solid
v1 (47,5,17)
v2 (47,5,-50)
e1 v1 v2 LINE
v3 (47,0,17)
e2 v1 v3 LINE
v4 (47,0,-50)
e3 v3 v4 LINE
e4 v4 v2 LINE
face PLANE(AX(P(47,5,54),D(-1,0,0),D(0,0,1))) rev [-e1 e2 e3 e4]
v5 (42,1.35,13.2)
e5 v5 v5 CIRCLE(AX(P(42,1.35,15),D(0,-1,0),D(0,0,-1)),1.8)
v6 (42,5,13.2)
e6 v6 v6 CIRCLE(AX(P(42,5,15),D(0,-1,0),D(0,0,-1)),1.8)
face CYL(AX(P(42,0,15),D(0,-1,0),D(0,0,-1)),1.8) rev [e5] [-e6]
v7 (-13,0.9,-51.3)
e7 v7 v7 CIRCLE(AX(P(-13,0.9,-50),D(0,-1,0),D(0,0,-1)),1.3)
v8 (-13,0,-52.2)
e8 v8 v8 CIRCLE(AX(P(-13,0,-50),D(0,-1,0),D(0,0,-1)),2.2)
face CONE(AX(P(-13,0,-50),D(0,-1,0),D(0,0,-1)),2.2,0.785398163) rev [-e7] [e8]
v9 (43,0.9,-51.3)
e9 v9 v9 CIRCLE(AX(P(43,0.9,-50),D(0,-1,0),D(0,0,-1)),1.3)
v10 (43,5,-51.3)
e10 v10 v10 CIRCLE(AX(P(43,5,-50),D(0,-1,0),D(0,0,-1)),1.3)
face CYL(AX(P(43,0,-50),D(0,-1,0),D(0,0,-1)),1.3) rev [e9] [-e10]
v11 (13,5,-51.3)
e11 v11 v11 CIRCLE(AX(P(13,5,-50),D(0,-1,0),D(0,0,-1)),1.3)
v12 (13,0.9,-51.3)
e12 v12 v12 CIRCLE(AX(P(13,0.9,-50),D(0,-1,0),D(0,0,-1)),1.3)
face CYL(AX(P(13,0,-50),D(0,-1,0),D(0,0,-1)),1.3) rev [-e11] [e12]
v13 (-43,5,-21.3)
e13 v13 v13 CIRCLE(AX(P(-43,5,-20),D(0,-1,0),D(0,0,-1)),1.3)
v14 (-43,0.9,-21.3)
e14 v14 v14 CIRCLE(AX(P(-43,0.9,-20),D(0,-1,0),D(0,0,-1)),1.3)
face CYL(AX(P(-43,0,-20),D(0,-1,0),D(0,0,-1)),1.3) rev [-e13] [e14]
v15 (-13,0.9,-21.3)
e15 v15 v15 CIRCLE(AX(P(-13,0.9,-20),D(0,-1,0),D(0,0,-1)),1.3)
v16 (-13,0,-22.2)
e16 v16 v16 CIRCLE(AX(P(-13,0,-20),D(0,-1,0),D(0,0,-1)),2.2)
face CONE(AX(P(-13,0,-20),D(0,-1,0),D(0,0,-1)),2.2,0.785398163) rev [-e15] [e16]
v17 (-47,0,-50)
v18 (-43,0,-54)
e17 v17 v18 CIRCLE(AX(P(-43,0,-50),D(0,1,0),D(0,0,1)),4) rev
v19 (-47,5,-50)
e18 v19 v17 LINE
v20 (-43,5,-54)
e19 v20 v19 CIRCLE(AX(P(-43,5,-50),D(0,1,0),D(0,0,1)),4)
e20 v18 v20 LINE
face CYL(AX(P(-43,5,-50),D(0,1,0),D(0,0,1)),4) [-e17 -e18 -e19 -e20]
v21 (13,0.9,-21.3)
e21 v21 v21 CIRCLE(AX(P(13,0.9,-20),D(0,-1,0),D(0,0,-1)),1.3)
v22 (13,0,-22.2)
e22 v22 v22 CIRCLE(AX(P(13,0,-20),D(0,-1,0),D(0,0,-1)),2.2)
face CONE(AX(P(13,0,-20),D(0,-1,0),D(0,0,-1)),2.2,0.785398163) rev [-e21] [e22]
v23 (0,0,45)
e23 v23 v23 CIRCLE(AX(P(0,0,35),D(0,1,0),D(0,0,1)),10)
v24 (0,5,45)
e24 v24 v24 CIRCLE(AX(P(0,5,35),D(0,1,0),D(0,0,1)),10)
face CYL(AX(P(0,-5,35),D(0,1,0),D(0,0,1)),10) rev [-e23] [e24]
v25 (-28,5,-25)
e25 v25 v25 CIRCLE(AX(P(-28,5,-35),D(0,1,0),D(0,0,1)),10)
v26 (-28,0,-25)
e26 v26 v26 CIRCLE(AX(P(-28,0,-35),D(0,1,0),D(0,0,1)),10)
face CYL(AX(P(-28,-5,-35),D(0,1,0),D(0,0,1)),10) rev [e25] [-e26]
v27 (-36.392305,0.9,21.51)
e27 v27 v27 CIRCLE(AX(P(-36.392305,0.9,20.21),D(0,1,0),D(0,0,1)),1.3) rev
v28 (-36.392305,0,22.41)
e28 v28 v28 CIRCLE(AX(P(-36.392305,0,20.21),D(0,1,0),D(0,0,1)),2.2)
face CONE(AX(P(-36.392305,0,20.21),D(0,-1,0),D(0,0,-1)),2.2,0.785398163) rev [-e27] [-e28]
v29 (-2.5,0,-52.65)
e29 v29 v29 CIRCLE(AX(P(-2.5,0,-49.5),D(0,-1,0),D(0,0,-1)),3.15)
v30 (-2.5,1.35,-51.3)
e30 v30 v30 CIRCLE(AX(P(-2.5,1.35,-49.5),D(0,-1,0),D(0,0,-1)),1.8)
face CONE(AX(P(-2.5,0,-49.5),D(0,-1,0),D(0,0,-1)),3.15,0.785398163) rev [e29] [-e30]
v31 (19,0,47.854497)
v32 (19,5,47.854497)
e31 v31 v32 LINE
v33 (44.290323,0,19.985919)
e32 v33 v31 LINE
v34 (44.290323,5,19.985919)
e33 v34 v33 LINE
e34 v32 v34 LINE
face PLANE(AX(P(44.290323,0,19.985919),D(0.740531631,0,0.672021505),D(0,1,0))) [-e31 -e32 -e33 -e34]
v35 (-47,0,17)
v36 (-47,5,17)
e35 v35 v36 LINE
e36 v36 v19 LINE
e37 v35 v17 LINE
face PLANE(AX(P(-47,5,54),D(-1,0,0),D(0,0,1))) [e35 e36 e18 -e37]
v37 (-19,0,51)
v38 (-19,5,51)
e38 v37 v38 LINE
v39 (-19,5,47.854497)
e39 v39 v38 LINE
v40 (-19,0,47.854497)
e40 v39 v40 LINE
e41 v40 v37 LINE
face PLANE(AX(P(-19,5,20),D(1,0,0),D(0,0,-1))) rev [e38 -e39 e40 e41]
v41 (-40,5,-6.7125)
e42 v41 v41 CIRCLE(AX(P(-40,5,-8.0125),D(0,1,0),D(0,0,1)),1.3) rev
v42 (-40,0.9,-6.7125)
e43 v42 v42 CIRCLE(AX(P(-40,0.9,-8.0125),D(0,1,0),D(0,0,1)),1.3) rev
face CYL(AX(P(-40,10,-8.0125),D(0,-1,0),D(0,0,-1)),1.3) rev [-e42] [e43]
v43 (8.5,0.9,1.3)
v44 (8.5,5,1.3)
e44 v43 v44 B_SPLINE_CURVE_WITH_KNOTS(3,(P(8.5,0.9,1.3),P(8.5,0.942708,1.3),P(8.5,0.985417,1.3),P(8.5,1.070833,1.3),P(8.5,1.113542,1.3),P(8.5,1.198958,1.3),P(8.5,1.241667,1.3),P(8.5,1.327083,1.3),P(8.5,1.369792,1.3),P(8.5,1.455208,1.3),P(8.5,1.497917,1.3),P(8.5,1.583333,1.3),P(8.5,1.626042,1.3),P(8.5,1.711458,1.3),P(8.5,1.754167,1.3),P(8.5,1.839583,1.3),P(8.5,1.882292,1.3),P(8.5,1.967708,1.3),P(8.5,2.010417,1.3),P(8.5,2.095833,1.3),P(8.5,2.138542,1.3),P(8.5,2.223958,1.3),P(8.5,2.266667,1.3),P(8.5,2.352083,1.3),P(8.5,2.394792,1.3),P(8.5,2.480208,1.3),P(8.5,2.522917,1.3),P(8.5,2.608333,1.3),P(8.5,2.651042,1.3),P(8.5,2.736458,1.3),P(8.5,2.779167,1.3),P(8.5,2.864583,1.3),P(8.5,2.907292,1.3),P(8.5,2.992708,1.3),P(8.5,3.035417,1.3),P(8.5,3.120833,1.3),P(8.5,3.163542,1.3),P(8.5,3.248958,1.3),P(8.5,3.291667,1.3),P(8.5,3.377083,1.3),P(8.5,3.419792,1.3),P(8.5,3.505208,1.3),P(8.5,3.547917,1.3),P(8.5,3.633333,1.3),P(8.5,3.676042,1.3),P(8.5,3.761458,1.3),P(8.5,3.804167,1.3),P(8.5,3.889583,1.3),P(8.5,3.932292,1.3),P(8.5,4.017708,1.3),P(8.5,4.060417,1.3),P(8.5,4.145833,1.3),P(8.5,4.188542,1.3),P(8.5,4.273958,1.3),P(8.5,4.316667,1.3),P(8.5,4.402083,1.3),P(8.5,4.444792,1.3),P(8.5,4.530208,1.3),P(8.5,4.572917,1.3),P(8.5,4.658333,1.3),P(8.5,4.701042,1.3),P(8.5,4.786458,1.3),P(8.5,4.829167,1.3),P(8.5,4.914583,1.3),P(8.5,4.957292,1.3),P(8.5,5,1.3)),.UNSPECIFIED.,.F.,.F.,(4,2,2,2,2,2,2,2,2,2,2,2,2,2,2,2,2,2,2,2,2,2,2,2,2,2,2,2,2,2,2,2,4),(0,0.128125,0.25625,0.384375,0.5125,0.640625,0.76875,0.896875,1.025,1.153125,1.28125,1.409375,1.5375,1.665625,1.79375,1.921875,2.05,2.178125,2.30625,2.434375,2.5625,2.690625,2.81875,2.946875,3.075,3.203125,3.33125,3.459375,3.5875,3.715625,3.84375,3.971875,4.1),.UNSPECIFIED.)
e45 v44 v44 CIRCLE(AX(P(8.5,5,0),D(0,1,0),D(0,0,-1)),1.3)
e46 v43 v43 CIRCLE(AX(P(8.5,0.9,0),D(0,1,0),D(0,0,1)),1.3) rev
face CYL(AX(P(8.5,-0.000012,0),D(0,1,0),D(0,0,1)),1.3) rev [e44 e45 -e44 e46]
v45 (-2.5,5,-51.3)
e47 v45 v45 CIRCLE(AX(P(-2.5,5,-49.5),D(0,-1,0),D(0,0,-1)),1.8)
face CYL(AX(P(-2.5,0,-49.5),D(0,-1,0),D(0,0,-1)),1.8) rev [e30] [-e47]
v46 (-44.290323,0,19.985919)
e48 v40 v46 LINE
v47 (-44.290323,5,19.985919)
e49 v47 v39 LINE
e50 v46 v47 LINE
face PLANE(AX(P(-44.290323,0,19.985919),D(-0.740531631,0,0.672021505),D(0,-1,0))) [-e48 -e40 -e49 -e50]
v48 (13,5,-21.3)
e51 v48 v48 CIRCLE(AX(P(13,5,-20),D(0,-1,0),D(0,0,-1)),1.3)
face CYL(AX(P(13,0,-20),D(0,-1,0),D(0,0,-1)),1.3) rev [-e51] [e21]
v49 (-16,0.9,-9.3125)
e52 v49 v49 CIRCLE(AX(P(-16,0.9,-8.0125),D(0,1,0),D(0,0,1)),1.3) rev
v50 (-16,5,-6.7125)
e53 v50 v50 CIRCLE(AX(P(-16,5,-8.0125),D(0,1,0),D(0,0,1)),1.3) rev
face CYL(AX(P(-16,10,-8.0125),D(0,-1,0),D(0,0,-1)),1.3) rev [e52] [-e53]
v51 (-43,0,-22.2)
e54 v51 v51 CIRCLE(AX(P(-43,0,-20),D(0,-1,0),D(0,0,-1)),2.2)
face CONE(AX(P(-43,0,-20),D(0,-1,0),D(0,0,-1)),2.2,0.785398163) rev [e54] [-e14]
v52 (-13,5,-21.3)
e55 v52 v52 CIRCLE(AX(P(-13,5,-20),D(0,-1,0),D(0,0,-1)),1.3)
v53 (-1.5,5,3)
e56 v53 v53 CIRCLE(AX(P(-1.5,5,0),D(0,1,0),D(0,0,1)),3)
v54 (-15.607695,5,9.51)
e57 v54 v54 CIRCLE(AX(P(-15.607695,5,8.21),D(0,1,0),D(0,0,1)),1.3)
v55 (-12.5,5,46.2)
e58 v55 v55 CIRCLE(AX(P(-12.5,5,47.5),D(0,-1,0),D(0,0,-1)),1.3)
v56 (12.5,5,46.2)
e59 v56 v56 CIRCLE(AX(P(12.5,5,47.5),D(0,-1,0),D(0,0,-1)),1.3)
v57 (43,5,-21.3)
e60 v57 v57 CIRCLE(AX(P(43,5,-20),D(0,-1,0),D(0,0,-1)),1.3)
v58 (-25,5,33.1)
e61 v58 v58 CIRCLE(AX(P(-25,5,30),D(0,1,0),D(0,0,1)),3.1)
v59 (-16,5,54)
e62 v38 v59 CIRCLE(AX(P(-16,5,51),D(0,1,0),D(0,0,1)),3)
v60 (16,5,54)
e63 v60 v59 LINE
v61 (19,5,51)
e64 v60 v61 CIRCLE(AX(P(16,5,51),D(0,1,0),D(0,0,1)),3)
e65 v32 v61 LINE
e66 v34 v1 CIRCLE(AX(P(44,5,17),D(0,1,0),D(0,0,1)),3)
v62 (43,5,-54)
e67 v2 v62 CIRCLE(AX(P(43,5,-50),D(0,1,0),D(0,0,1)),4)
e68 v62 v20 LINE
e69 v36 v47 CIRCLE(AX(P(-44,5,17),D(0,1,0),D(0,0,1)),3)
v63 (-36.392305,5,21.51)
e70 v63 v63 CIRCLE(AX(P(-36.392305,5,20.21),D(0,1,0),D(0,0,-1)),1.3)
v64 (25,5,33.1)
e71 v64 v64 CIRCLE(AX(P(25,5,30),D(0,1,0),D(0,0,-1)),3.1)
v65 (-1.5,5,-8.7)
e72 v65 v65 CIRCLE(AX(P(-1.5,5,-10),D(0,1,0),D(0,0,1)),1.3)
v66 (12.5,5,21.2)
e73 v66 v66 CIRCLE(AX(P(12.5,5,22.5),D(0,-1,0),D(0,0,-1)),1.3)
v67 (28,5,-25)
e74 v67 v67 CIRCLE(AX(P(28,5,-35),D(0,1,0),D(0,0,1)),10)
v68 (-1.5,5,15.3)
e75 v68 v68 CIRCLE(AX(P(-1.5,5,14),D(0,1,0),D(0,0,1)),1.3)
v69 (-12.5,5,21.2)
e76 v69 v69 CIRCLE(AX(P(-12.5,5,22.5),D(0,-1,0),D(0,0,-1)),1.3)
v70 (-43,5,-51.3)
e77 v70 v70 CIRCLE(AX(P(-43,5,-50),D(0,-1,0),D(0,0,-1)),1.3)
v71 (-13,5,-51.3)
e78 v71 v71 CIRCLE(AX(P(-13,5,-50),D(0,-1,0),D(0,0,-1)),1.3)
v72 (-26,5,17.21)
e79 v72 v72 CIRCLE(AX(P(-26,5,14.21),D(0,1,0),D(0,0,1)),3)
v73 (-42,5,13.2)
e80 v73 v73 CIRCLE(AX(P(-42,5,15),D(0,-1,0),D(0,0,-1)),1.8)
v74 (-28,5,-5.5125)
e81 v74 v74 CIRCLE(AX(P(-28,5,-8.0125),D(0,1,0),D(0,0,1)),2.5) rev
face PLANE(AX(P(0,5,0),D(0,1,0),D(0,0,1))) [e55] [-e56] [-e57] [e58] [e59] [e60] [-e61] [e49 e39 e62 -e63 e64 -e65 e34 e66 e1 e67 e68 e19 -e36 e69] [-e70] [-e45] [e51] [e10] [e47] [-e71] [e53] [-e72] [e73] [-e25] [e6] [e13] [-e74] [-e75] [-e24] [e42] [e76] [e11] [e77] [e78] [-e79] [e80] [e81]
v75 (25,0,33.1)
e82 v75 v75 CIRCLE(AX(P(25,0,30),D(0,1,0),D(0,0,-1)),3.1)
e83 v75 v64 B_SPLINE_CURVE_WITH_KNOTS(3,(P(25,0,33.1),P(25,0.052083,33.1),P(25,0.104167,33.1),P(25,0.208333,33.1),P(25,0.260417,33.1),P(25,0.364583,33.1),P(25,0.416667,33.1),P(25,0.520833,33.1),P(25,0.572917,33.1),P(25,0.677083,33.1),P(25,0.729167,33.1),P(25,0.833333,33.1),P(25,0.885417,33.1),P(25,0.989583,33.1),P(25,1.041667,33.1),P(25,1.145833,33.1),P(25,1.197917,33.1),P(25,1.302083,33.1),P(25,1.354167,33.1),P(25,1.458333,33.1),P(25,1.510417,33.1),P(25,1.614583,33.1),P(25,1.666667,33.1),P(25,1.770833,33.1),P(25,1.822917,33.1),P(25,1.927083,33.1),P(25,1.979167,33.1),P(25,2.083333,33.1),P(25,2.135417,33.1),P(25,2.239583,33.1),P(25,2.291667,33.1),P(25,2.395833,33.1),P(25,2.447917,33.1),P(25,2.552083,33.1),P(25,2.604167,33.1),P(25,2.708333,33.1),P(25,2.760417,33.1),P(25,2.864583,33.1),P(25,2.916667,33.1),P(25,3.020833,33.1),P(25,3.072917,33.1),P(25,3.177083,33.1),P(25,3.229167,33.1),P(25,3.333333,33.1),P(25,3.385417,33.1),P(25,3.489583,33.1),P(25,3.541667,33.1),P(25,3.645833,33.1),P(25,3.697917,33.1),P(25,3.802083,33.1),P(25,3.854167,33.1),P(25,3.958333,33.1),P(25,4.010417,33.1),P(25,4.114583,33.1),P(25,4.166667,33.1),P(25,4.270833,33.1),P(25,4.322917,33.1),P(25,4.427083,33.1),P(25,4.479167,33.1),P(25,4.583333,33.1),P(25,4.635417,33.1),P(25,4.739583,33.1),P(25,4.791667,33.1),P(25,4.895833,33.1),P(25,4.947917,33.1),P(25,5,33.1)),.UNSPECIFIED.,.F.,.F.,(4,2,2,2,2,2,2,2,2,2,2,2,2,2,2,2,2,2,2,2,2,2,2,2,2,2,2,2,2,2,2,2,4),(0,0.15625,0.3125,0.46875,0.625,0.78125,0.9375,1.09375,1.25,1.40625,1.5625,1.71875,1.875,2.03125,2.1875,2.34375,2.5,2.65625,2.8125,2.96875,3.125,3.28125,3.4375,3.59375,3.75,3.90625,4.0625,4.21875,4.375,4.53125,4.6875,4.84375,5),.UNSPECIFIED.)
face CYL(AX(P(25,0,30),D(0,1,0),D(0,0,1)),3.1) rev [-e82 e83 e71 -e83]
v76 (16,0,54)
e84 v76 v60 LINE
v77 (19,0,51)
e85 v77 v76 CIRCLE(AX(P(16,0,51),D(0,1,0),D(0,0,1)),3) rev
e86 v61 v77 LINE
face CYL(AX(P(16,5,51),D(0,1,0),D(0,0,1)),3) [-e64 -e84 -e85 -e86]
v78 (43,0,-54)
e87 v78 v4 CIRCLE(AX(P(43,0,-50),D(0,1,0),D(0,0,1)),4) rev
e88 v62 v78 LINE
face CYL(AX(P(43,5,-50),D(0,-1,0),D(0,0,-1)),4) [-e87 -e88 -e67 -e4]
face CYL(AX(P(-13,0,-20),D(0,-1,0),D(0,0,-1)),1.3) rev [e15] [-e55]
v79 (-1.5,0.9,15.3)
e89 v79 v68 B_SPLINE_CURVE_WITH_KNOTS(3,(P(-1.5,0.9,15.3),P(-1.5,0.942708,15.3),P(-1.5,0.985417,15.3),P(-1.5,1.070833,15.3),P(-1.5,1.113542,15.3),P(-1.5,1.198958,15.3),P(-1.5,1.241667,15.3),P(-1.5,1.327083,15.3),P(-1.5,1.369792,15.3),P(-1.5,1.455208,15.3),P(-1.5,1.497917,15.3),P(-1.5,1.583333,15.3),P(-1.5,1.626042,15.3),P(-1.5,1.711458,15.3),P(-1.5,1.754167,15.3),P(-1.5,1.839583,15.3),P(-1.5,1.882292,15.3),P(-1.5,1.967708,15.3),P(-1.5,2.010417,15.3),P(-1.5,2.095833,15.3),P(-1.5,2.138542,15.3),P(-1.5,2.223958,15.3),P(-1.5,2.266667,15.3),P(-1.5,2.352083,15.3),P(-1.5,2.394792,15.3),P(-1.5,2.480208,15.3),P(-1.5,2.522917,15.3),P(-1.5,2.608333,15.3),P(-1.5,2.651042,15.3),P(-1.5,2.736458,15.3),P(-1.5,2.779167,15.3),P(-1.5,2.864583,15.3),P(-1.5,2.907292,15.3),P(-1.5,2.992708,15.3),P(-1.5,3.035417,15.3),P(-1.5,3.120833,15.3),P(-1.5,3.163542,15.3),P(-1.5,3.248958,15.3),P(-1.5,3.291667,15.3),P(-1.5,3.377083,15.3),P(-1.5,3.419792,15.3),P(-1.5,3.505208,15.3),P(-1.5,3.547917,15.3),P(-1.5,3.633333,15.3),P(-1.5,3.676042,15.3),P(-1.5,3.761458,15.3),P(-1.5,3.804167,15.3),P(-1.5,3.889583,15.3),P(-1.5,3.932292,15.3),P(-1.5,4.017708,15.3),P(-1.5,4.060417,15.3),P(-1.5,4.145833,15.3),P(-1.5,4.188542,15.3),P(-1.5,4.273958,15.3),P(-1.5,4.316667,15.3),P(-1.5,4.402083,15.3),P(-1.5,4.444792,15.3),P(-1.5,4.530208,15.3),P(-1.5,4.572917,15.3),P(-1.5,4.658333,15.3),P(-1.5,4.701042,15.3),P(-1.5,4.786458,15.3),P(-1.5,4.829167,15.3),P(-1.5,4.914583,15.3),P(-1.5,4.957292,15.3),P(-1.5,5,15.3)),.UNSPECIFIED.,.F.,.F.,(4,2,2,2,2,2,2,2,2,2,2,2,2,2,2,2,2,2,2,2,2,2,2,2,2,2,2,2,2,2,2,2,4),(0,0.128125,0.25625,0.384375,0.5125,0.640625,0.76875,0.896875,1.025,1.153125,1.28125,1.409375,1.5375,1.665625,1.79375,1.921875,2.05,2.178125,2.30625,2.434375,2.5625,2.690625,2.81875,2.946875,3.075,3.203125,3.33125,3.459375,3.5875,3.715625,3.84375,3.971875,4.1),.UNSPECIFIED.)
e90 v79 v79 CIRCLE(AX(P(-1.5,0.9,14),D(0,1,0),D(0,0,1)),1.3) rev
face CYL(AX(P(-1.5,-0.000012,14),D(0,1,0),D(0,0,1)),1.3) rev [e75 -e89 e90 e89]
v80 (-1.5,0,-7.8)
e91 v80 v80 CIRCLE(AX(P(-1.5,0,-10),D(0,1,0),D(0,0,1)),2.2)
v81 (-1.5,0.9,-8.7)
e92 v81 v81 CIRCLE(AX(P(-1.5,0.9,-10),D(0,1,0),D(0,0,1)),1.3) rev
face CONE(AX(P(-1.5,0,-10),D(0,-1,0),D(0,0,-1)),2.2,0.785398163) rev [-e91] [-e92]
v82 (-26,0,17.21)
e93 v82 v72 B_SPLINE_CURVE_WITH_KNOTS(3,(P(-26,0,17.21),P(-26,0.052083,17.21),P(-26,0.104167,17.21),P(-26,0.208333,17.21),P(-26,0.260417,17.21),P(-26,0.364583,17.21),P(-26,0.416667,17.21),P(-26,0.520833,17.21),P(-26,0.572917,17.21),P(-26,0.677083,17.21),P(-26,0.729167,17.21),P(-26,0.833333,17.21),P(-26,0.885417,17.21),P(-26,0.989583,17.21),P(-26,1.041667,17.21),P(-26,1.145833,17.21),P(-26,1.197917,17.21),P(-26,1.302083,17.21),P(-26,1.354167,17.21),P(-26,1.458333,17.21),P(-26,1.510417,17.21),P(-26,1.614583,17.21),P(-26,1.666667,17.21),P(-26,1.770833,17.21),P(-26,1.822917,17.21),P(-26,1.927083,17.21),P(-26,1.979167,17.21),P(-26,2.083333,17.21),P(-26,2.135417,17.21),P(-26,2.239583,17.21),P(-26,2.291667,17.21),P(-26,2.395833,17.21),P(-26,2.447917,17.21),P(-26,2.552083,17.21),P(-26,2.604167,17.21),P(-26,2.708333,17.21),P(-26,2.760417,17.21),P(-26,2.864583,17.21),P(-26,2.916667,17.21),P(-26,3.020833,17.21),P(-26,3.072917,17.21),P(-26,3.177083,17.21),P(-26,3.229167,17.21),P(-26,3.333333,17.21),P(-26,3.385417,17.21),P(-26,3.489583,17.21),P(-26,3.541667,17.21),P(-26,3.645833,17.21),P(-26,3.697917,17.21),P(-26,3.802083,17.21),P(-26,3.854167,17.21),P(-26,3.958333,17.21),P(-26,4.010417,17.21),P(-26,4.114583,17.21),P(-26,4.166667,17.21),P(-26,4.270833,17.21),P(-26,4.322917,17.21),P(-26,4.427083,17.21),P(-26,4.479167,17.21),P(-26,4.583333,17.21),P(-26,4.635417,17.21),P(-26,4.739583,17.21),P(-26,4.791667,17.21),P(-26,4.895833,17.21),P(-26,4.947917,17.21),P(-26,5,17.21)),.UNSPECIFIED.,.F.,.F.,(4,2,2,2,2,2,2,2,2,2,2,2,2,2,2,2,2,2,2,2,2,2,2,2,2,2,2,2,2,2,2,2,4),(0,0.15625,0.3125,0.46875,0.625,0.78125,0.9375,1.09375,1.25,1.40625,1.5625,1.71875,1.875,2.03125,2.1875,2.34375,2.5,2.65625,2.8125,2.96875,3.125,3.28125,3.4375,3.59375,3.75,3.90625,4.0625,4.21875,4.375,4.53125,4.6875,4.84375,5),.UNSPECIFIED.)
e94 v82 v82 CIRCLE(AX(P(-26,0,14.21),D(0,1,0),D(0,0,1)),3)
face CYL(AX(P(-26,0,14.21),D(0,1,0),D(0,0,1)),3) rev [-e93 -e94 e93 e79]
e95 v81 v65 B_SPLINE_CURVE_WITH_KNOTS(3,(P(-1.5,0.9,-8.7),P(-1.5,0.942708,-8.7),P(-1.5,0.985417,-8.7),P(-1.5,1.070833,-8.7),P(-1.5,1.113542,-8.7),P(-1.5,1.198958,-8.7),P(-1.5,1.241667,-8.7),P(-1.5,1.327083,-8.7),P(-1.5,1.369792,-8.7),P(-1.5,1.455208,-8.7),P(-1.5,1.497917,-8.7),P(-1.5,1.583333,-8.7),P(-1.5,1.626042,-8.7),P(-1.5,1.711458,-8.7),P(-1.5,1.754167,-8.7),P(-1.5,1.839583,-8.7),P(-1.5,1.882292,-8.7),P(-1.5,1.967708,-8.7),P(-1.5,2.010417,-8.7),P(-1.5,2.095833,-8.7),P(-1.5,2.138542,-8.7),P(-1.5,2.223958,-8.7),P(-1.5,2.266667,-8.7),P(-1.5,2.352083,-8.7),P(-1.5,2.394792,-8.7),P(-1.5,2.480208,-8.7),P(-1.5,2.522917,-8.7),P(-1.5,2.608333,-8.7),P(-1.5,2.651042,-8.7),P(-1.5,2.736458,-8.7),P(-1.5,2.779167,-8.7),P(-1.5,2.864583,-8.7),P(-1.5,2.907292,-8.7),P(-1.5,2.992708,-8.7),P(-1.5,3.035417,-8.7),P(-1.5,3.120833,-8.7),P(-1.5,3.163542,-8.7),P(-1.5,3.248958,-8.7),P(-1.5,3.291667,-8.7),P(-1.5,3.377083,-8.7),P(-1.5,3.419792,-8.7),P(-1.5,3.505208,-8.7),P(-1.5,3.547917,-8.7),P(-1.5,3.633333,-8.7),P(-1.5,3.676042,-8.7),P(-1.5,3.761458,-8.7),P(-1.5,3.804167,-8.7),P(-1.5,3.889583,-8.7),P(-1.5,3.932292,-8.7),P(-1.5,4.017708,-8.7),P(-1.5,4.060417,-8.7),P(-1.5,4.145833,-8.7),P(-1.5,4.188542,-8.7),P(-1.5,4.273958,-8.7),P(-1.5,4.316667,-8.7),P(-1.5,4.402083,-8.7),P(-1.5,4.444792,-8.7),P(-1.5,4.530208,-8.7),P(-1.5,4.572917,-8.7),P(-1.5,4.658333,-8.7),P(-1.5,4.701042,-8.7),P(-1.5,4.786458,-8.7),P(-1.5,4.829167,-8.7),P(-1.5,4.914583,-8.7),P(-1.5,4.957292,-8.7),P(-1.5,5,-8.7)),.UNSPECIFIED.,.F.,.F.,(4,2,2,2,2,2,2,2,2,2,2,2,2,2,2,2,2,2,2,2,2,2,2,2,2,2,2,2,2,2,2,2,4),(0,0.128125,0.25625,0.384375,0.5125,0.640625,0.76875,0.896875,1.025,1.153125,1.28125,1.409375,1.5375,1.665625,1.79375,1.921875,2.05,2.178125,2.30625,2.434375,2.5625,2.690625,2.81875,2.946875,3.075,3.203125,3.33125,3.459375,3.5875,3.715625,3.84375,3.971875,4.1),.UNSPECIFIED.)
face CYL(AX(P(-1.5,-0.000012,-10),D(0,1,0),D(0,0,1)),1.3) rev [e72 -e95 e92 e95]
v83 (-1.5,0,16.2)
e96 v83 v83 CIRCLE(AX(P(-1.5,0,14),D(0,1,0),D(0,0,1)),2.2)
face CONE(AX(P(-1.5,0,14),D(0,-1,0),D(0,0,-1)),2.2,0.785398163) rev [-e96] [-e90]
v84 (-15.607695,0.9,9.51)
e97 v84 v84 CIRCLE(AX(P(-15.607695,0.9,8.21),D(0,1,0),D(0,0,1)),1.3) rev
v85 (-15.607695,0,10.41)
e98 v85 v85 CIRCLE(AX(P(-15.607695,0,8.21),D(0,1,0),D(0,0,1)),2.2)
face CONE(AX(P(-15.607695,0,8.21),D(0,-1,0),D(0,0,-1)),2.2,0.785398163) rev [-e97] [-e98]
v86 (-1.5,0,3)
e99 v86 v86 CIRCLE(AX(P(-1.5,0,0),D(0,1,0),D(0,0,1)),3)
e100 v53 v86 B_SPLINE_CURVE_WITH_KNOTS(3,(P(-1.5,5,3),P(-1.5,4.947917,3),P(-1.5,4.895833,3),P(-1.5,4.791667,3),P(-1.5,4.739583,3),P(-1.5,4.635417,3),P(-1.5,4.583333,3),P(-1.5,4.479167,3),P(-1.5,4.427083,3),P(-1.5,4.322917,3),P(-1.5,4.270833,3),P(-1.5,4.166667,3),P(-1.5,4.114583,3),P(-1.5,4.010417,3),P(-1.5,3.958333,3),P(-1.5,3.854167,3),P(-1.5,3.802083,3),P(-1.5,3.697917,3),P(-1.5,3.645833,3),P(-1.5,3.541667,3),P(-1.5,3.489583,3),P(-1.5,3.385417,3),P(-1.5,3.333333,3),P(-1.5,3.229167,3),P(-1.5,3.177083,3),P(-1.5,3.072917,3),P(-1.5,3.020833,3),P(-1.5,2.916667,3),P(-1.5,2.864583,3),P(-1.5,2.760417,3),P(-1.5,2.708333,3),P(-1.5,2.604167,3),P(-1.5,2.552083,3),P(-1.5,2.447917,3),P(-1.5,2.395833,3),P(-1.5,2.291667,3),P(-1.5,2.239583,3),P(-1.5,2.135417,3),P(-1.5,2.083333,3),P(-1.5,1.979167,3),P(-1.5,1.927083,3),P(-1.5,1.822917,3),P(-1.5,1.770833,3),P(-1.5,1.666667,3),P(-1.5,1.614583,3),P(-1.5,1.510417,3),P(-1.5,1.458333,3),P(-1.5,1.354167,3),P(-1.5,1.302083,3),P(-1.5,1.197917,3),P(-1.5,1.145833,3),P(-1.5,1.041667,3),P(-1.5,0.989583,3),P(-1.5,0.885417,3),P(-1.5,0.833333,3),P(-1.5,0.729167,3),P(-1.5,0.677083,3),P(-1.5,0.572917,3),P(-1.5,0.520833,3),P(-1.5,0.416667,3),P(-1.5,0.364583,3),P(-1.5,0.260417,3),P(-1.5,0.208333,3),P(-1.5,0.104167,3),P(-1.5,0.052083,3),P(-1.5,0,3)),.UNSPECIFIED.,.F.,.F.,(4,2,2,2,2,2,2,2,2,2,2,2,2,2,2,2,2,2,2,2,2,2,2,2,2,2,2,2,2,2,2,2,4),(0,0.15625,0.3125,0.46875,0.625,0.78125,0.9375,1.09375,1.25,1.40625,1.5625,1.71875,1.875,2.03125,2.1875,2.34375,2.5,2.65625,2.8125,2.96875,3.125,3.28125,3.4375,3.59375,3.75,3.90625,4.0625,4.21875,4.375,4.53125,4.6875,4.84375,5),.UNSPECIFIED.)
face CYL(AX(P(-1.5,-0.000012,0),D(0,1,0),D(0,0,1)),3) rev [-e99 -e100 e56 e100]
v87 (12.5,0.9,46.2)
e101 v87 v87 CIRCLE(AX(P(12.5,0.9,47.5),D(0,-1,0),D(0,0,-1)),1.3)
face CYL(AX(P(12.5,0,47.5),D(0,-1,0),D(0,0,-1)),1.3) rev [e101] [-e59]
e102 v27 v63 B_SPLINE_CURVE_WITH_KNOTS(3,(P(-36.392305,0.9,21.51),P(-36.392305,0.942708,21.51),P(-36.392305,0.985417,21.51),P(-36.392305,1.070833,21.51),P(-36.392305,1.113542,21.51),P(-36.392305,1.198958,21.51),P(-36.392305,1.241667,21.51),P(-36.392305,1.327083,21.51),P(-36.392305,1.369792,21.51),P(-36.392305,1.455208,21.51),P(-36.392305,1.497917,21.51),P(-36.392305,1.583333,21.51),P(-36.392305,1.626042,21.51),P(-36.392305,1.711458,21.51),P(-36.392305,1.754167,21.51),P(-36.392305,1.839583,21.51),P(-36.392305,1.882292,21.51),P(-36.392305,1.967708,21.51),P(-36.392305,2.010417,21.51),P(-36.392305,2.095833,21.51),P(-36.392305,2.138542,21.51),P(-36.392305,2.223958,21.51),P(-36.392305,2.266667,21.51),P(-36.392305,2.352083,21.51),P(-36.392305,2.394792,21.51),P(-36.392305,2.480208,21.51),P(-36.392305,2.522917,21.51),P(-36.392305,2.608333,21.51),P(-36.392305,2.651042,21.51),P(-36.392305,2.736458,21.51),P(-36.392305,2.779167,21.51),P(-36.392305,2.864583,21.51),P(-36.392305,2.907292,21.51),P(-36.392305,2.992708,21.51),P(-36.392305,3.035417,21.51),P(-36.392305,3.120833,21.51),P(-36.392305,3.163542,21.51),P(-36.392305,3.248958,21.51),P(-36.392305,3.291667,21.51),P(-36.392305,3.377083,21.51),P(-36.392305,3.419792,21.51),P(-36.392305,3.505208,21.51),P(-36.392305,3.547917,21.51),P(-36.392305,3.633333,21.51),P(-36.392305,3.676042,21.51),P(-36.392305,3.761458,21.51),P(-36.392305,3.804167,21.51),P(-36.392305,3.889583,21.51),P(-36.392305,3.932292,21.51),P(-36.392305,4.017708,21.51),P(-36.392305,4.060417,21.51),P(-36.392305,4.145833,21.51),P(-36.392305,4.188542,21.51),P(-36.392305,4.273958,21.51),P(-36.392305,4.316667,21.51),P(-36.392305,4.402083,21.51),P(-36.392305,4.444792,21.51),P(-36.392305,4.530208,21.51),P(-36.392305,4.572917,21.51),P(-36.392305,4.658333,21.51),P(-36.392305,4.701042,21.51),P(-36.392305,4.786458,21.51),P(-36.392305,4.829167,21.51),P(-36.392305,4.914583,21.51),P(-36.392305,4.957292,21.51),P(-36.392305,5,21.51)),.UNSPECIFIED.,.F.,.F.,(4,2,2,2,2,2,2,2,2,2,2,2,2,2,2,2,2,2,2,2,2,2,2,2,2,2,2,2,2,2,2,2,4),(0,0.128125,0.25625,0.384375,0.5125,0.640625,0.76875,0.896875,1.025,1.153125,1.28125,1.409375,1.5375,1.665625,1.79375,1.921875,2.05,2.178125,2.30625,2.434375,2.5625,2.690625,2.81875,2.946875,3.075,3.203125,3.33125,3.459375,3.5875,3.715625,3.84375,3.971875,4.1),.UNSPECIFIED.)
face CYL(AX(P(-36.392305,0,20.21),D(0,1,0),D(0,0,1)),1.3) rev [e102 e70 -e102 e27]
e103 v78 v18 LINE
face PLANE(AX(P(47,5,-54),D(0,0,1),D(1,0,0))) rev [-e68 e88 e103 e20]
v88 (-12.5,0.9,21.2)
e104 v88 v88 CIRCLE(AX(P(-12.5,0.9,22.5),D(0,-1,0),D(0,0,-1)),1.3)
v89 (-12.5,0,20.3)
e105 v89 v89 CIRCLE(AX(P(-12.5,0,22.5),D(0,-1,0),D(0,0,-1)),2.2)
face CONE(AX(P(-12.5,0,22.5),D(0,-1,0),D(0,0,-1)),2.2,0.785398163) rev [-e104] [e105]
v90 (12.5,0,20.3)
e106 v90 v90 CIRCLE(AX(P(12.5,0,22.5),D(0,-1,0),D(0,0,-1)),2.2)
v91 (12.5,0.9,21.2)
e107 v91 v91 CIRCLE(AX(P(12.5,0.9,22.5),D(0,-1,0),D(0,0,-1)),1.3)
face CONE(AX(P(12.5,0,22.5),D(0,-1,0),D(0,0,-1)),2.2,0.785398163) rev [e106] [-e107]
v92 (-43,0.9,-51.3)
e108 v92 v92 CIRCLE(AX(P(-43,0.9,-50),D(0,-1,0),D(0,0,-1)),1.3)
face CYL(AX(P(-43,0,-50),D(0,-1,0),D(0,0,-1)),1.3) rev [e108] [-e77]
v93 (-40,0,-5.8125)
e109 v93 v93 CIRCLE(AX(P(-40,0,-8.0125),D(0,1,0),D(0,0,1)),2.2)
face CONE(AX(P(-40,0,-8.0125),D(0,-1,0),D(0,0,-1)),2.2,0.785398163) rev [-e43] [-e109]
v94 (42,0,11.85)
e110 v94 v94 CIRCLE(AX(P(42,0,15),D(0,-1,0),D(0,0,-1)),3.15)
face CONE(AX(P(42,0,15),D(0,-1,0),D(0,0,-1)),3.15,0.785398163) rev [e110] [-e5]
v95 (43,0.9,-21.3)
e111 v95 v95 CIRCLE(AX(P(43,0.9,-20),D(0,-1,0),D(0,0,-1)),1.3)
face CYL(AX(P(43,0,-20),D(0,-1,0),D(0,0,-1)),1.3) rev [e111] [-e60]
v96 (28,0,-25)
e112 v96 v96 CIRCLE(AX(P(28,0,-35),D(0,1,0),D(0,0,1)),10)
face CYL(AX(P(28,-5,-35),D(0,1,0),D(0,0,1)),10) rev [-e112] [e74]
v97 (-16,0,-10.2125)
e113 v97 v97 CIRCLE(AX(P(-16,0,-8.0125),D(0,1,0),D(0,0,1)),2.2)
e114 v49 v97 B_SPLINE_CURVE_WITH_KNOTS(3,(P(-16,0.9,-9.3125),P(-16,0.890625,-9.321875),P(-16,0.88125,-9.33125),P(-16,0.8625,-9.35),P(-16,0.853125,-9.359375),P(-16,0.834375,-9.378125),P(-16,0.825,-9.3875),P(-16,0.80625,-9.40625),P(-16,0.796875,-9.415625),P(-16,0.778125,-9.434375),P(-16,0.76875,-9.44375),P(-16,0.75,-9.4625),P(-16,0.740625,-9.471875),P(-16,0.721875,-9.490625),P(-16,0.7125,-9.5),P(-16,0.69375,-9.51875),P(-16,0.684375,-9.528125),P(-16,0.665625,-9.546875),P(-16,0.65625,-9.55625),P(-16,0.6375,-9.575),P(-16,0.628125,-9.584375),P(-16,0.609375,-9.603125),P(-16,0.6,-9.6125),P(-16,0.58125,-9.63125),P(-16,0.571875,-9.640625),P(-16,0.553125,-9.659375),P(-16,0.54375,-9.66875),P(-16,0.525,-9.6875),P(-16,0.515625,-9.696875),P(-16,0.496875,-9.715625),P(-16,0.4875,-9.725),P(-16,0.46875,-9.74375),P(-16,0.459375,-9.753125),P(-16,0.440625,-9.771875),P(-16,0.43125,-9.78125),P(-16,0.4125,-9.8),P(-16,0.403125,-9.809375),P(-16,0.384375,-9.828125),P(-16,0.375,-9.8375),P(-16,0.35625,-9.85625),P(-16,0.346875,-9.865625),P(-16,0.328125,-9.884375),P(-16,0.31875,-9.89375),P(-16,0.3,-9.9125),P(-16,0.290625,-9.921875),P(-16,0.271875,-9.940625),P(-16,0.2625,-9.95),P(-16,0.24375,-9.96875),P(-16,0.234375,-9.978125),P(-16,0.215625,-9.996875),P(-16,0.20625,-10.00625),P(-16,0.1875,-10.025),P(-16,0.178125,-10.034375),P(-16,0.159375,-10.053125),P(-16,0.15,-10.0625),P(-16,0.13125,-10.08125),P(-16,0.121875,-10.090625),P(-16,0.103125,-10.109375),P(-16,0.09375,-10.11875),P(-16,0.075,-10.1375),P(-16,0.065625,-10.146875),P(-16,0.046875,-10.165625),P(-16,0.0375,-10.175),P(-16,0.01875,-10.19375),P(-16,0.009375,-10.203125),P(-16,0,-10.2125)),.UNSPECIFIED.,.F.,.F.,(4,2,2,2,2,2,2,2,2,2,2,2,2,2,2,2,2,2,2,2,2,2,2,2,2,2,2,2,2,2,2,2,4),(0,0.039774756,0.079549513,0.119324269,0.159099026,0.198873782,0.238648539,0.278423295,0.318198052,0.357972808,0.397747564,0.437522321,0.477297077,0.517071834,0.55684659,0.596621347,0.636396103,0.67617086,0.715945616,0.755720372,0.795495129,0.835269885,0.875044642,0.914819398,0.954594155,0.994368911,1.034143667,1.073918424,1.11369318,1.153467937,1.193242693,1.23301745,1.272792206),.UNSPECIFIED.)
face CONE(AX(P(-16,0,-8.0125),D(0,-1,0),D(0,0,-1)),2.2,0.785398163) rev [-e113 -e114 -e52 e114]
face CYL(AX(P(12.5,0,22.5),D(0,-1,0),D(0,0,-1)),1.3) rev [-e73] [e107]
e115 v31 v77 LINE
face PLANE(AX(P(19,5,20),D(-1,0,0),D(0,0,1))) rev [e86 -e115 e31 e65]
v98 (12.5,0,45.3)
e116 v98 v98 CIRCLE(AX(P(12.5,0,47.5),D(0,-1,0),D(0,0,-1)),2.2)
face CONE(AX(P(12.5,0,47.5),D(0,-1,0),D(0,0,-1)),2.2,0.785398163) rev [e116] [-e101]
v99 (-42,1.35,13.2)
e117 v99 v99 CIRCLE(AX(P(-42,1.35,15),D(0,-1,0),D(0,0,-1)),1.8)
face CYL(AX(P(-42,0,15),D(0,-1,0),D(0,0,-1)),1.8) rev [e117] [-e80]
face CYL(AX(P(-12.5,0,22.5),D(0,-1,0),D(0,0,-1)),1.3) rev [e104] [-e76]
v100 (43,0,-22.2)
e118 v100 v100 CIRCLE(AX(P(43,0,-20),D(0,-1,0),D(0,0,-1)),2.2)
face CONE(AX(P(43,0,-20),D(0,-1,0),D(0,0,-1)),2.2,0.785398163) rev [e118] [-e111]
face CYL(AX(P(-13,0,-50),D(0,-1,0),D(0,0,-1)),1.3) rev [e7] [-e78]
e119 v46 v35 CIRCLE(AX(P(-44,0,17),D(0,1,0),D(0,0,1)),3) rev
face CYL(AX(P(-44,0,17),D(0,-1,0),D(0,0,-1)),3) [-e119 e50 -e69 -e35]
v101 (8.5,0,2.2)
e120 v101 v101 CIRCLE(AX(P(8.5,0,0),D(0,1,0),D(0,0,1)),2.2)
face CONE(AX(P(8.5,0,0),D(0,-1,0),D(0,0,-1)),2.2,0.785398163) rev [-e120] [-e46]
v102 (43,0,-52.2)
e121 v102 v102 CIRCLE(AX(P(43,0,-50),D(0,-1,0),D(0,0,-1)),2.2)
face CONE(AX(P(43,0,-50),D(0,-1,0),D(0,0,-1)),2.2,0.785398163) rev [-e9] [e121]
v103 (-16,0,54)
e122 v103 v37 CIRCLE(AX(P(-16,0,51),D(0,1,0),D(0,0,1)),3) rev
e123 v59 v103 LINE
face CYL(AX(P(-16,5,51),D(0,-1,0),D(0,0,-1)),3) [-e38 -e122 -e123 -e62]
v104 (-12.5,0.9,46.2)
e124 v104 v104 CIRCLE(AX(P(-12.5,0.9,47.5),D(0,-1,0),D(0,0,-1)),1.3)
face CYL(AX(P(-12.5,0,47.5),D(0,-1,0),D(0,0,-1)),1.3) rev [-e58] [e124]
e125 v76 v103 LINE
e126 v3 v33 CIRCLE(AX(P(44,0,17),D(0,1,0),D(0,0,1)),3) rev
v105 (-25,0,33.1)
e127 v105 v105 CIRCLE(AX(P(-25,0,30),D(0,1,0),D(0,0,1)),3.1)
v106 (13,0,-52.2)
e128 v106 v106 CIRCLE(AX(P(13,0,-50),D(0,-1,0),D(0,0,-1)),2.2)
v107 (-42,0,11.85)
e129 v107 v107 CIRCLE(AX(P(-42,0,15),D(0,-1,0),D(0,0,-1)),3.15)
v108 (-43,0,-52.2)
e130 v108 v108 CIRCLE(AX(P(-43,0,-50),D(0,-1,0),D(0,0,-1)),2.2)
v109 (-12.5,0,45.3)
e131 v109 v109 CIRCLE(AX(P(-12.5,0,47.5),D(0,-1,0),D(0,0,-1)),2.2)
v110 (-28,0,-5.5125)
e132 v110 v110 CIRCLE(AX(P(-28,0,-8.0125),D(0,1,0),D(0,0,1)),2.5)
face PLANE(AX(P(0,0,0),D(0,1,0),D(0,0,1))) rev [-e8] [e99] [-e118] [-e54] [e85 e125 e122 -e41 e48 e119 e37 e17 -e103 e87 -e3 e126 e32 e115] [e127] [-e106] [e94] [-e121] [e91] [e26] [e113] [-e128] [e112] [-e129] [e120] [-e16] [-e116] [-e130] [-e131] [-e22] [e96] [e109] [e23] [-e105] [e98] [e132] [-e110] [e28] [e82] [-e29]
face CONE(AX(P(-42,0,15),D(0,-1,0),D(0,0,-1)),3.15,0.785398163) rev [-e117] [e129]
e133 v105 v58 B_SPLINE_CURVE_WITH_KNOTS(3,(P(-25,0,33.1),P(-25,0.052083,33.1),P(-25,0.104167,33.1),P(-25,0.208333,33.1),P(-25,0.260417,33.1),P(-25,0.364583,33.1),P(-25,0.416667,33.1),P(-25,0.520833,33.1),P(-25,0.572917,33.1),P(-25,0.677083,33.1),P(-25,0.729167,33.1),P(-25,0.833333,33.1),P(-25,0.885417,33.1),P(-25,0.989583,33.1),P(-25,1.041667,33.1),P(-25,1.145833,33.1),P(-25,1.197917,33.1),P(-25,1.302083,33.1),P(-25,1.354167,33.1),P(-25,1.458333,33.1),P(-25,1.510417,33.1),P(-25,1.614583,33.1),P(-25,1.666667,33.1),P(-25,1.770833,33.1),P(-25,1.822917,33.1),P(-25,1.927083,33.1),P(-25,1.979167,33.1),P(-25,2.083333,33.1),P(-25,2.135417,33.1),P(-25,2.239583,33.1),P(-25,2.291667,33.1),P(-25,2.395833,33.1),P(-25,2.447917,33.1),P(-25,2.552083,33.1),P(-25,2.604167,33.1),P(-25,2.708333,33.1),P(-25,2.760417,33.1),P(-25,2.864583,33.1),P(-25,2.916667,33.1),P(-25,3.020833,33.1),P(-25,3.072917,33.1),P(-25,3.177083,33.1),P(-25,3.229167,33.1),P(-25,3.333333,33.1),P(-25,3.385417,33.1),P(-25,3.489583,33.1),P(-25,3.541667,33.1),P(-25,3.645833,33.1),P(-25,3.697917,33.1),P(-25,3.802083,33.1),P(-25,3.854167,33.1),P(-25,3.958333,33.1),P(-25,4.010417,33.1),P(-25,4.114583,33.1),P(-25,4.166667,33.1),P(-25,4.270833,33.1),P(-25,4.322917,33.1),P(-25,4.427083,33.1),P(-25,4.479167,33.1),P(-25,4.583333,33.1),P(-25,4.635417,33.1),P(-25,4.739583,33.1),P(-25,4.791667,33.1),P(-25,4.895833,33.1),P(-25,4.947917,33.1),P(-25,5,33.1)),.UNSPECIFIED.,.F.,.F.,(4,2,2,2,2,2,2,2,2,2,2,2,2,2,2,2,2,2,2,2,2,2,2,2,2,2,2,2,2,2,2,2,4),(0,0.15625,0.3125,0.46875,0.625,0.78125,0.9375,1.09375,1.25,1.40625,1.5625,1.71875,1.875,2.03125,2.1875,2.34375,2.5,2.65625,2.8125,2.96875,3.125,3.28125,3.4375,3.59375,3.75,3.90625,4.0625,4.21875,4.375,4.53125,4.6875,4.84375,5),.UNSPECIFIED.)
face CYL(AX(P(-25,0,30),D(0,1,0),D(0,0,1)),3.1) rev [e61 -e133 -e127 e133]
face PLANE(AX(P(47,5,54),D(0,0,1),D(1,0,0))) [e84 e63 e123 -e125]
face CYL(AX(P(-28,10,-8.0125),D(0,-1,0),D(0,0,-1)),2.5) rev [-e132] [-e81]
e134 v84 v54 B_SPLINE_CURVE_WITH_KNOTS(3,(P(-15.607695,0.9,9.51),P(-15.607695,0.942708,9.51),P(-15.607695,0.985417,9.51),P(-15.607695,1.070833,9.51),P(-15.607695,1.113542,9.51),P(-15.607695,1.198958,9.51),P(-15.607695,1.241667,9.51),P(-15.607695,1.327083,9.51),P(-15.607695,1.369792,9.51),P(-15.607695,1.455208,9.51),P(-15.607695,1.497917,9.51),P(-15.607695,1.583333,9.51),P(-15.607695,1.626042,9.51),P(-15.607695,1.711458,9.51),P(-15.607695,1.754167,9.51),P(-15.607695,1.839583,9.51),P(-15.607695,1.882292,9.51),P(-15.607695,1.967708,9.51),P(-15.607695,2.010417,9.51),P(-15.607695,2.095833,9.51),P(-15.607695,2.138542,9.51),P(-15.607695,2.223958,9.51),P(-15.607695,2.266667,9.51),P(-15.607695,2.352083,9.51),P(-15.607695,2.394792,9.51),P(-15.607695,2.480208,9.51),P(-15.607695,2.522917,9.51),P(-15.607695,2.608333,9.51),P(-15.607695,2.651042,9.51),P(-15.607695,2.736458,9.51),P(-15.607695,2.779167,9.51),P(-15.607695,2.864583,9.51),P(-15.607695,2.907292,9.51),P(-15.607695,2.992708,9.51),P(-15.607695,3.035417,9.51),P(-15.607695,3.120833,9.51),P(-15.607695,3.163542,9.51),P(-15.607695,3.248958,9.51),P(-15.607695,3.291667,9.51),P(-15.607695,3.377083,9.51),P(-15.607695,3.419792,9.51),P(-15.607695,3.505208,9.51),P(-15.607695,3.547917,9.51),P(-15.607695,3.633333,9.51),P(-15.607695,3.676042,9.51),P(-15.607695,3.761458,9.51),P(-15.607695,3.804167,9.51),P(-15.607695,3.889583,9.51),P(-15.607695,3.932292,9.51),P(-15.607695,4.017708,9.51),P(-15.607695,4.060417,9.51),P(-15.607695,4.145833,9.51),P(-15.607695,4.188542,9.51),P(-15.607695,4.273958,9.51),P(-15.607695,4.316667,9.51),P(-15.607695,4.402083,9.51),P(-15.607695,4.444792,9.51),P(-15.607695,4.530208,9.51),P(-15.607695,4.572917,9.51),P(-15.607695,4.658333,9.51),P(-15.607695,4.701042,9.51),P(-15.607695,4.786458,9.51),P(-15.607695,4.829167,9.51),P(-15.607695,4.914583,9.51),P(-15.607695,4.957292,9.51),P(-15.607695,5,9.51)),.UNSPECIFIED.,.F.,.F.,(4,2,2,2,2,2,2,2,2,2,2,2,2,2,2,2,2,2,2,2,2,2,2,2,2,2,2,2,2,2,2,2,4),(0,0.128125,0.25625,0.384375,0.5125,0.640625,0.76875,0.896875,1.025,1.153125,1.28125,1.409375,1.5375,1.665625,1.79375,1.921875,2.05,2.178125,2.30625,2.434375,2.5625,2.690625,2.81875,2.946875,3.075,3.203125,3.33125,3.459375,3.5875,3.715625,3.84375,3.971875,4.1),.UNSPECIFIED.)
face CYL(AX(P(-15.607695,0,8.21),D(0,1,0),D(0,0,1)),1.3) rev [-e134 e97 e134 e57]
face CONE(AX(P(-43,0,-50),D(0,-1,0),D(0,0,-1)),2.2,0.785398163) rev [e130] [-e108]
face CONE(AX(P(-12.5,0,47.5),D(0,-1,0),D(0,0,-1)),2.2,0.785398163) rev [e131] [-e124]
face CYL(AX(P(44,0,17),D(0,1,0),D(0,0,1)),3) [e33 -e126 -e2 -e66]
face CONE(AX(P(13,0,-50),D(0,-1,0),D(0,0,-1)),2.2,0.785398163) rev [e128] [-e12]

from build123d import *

# Parameters (mm, degrees)
SKETCH1_W                                       = 94
SKETCH1_H                                       = 108
BOSS_EXTRUDE1_DEPTH                             = 5
FILLET1_R                                       = 4
SKETCH22_W                                      = 28
SKETCH22_H                                      = 5
CUT_EXTRUDE3_DEPTH                              = 34
CSK_FOR_M3_FLAT_HEAD_MACHINE_SCREW1_D           = 3.6
CSK_FOR_M3_FLAT_HEAD_MACHINE_SCREW1_CSINK_D     = 6.3
CSK_FOR_M3_FLAT_HEAD_MACHINE_SCREW1_CSINK_ANGLE = 90
FILLET4_R                                       = 3
CHAMFER3_DEPTH                                  = 5
CSK_FOR_M2_FLAT_HEAD_MACHINE_SCREW2_D           = 2.6
CSK_FOR_M2_FLAT_HEAD_MACHINE_SCREW2_CSINK_D     = 4.4
CSK_FOR_M2_FLAT_HEAD_MACHINE_SCREW2_CSINK_ANGLE = 90
CUT_EXTRUDE4_DEPTH                              = 72.763500472
CUT_EXTRUDE4_DEPTH_BACK                         = 72.763500472
SKETCH25_R                                      = 1.3
SKETCH25_R_2                                    = 3
CHAMFER1_SIZE                                   = 0.9
SKETCH26_R                                      = 2.5
SKETCH26_R_2                                    = 1.3
CUT_EXTRUDE8_DEPTH                              = 10
CHAMFER2_SIZE                                   = 0.9
SKETCH27_R                                      = 10
CUT_EXTRUDE9_DEPTH                              = 10
SKETCH29_R                                      = 3.1
CUT_EXTRUDE11_DEPTH                             = 72.763500472
SKETCH30_R                                      = 3
SKETCH30_R_2                                    = 1.3
CUT_EXTRUDE12_DEPTH                             = 72.763500472
CHAMFER4_SIZE                                   = 0.9


with BuildPart() as part:
    # Sketch1 → Boss-Extrude1 (new body)
    with BuildSketch(Plane(origin=(0, 0, 0), x_dir=(1, 0, 0), z_dir=(0, 1, 0))):
        Rectangle(SKETCH1_W, SKETCH1_H)
    extrude(amount=BOSS_EXTRUDE1_DEPTH)

    # Fillet1
    fillet1_edges = [part.edges().sort_by_distance(p)[0] for p in [
        (47, 2.5, 54),
        (-47, 2.5, 54),
        (-47, 2.5, -54),
        (47, 2.5, -54),
    ]]
    fillet(fillet1_edges, radius=FILLET1_R)

    # Sketch22 → Cut-Extrude3 (cut)
    with BuildSketch(Plane.XY.offset(54)):
        with Locations((-33, 2.5)):
            Rectangle(SKETCH22_W, SKETCH22_H)
        with Locations((33, 2.5)):
            Rectangle(SKETCH22_W, SKETCH22_H)
    extrude(amount=-CUT_EXTRUDE3_DEPTH, mode=Mode.SUBTRACT)

    # CSK for M3 Flat Head Machine Screw1 (through all)
    with Locations(Plane(origin=(0, 0, 0), x_dir=(-1, 0, 0), z_dir=(0, -1, 0))):
        with Locations((-42, -49), (2.5, 49.5), (42, -49), (-42, -15), (42, -15)):
            CounterSinkHole(CSK_FOR_M3_FLAT_HEAD_MACHINE_SCREW1_D / 2, CSK_FOR_M3_FLAT_HEAD_MACHINE_SCREW1_CSINK_D / 2, counter_sink_angle=CSK_FOR_M3_FLAT_HEAD_MACHINE_SCREW1_CSINK_ANGLE)

    # Fillet4
    fillet4_edges = [part.edges().sort_by_distance(p)[0] for p in [
        (-47, 2.5, 20),
        (-19, 2.5, 54),
        (47, 2.5, 20),
        (19, 2.5, 54),
    ]]
    fillet(fillet4_edges, radius=FILLET4_R)

    # Chamfer3: read off the stored shape, not the designer's step
    # Chamfer3 outline → Chamfer3 (add)
    with BuildSketch(Plane(origin=(0, 0, 0), x_dir=(1, 0, 0), z_dir=(0, 1, 0))):
        with BuildLine():
            Line((19, -20), (19, -47.854497241))
            Line((19, -47.854497241), (44.290322581, -19.985919088))
            ThreePointArc((44.290322581, -19.985919088), (44.145331925, -19.996477704), (44, -20))
            Line((44, -20), (19, -20))
        make_face()
        with BuildLine():
            ThreePointArc((-44, -20), (-44.145331925, -19.996477704), (-44.290322581, -19.985919088))
            Line((-44.290322581, -19.985919088), (-19, -47.854497241))
            Line((-19, -47.854497241), (-19, -20))
            Line((-19, -20), (-44, -20))
        make_face()
    extrude(amount=CHAMFER3_DEPTH)

    # CSK for M2 Flat Head Machine Screw2 (through all)
    with Locations(Plane(origin=(0, 0, 0), x_dir=(-1, 0, 0), z_dir=(0, -1, 0))):
        with Locations((12.5, -47.5), (-12.5, -47.5), (12.5, -22.5), (-12.5, -22.5), (-43, 50), (-13, 50), (-43, 20), (-13, 20), (43, 50), (43, 20), (13, 50), (13, 20)):
            CounterSinkHole(CSK_FOR_M2_FLAT_HEAD_MACHINE_SCREW2_D / 2, CSK_FOR_M2_FLAT_HEAD_MACHINE_SCREW2_CSINK_D / 2, counter_sink_angle=CSK_FOR_M2_FLAT_HEAD_MACHINE_SCREW2_CSINK_ANGLE)

    # Sketch25 → Cut-Extrude4 (cut, two sides: drawn at the far end of the back side and taken through both)
    with BuildSketch(Plane(origin=(0, 0, 0), x_dir=(1, 0, 0), z_dir=(0, 1, 0)).offset(-CUT_EXTRUDE4_DEPTH_BACK)):
        with Locations(Location((-1.5, 10, 0), (0, 0, 270))):
            Circle(SKETCH25_R)
        with Locations(Location((8.5, 0, 0), (0, 0, 270))):
            Circle(SKETCH25_R)
        with Locations(Location((-1.5, -14, 0), (0, 0, 270))):
            Circle(SKETCH25_R)
        with Locations(Location((-1.5, 0, 0), (0, 0, 270))):
            Circle(SKETCH25_R_2)
    extrude(amount=CUT_EXTRUDE4_DEPTH + CUT_EXTRUDE4_DEPTH_BACK, mode=Mode.SUBTRACT)

    # Chamfer1
    chamfer1_edges = [part.edges().sort_by_distance(p)[0] for p in [
        (-1.5, 0, -11.3),
        (8.5, 0, -1.3),
        (-1.5, 0, 12.7),
    ]]
    chamfer(chamfer1_edges, length=CHAMFER1_SIZE)

    # Sketch26 → Cut-Extrude8 (cut)
    with BuildSketch(Plane(origin=(0, 0, 0), x_dir=(1, 0, 0), z_dir=(0, 1, 0))):
        with Locations(Location((-28, 8.0125, 0), (0, 0, 270))):
            Circle(SKETCH26_R)
        with Locations(Location((-40, 8.0125, 0), (0, 0, 270))):
            Circle(SKETCH26_R_2)
        with Locations(Location((-16, 8.0125, 0), (0, 0, 90))):
            Circle(SKETCH26_R_2)
    extrude(amount=CUT_EXTRUDE8_DEPTH, mode=Mode.SUBTRACT)

    # Chamfer2
    chamfer2_edges = [part.edges().sort_by_distance(p)[0] for p in [
        (-16, 0, -6.7125),
        (-40, 0, -9.3125),
    ]]
    chamfer(chamfer2_edges, length=CHAMFER2_SIZE)

    # Sketch27 → Cut-Extrude9 (cut)
    with BuildSketch(Plane(origin=(0, 5, 0), x_dir=(1, 0, 0), z_dir=(0, 1, 0))):
        with Locations(Location((-28, 35, 0), (0, 0, 270))):
            Circle(SKETCH27_R)
        with Locations(Location((28, 35, 0), (0, 0, 270))):
            Circle(SKETCH27_R)
        with Locations(Location((0, -35, 0), (0, 0, 270))):
            Circle(SKETCH27_R)
    extrude(amount=-CUT_EXTRUDE9_DEPTH, mode=Mode.SUBTRACT)

    # Sketch29 → Cut-Extrude11 (cut, through all)
    with BuildSketch(Plane(origin=(0, 5, 0), x_dir=(1, 0, 0), z_dir=(0, 1, 0))):
        with Locations(Location((-25, -30, 0), (0, 0, 270))):
            Circle(SKETCH29_R)
        with Locations(Location((25, -30, 0), (0, 0, 270))):
            Circle(SKETCH29_R)
    extrude(amount=-CUT_EXTRUDE11_DEPTH, mode=Mode.SUBTRACT)

    # Sketch30 → Cut-Extrude12 (cut, through all)
    with BuildSketch(Plane(origin=(0, 5, 0), x_dir=(1, 0, 0), z_dir=(0, 1, 0))):
        with Locations(Location((-26, -14.21, 0), (0, 0, 270))):
            Circle(SKETCH30_R)
        with Locations(Location((-15.607695155, -8.21, 0), (0, 0, 270))):
            Circle(SKETCH30_R_2)
        with Locations(Location((-36.392304845, -20.21, 0), (0, 0, 270))):
            Circle(SKETCH30_R_2)
    extrude(amount=-CUT_EXTRUDE12_DEPTH, mode=Mode.SUBTRACT)

    # Chamfer4
    chamfer4_edges = [part.edges().sort_by_distance(p)[0] for p in [
        (-36.392304845, 0, 18.91),
        (-15.607695155, 0, 6.91),
    ]]
    chamfer(chamfer4_edges, length=CHAMFER4_SIZE)


solid = part.part
